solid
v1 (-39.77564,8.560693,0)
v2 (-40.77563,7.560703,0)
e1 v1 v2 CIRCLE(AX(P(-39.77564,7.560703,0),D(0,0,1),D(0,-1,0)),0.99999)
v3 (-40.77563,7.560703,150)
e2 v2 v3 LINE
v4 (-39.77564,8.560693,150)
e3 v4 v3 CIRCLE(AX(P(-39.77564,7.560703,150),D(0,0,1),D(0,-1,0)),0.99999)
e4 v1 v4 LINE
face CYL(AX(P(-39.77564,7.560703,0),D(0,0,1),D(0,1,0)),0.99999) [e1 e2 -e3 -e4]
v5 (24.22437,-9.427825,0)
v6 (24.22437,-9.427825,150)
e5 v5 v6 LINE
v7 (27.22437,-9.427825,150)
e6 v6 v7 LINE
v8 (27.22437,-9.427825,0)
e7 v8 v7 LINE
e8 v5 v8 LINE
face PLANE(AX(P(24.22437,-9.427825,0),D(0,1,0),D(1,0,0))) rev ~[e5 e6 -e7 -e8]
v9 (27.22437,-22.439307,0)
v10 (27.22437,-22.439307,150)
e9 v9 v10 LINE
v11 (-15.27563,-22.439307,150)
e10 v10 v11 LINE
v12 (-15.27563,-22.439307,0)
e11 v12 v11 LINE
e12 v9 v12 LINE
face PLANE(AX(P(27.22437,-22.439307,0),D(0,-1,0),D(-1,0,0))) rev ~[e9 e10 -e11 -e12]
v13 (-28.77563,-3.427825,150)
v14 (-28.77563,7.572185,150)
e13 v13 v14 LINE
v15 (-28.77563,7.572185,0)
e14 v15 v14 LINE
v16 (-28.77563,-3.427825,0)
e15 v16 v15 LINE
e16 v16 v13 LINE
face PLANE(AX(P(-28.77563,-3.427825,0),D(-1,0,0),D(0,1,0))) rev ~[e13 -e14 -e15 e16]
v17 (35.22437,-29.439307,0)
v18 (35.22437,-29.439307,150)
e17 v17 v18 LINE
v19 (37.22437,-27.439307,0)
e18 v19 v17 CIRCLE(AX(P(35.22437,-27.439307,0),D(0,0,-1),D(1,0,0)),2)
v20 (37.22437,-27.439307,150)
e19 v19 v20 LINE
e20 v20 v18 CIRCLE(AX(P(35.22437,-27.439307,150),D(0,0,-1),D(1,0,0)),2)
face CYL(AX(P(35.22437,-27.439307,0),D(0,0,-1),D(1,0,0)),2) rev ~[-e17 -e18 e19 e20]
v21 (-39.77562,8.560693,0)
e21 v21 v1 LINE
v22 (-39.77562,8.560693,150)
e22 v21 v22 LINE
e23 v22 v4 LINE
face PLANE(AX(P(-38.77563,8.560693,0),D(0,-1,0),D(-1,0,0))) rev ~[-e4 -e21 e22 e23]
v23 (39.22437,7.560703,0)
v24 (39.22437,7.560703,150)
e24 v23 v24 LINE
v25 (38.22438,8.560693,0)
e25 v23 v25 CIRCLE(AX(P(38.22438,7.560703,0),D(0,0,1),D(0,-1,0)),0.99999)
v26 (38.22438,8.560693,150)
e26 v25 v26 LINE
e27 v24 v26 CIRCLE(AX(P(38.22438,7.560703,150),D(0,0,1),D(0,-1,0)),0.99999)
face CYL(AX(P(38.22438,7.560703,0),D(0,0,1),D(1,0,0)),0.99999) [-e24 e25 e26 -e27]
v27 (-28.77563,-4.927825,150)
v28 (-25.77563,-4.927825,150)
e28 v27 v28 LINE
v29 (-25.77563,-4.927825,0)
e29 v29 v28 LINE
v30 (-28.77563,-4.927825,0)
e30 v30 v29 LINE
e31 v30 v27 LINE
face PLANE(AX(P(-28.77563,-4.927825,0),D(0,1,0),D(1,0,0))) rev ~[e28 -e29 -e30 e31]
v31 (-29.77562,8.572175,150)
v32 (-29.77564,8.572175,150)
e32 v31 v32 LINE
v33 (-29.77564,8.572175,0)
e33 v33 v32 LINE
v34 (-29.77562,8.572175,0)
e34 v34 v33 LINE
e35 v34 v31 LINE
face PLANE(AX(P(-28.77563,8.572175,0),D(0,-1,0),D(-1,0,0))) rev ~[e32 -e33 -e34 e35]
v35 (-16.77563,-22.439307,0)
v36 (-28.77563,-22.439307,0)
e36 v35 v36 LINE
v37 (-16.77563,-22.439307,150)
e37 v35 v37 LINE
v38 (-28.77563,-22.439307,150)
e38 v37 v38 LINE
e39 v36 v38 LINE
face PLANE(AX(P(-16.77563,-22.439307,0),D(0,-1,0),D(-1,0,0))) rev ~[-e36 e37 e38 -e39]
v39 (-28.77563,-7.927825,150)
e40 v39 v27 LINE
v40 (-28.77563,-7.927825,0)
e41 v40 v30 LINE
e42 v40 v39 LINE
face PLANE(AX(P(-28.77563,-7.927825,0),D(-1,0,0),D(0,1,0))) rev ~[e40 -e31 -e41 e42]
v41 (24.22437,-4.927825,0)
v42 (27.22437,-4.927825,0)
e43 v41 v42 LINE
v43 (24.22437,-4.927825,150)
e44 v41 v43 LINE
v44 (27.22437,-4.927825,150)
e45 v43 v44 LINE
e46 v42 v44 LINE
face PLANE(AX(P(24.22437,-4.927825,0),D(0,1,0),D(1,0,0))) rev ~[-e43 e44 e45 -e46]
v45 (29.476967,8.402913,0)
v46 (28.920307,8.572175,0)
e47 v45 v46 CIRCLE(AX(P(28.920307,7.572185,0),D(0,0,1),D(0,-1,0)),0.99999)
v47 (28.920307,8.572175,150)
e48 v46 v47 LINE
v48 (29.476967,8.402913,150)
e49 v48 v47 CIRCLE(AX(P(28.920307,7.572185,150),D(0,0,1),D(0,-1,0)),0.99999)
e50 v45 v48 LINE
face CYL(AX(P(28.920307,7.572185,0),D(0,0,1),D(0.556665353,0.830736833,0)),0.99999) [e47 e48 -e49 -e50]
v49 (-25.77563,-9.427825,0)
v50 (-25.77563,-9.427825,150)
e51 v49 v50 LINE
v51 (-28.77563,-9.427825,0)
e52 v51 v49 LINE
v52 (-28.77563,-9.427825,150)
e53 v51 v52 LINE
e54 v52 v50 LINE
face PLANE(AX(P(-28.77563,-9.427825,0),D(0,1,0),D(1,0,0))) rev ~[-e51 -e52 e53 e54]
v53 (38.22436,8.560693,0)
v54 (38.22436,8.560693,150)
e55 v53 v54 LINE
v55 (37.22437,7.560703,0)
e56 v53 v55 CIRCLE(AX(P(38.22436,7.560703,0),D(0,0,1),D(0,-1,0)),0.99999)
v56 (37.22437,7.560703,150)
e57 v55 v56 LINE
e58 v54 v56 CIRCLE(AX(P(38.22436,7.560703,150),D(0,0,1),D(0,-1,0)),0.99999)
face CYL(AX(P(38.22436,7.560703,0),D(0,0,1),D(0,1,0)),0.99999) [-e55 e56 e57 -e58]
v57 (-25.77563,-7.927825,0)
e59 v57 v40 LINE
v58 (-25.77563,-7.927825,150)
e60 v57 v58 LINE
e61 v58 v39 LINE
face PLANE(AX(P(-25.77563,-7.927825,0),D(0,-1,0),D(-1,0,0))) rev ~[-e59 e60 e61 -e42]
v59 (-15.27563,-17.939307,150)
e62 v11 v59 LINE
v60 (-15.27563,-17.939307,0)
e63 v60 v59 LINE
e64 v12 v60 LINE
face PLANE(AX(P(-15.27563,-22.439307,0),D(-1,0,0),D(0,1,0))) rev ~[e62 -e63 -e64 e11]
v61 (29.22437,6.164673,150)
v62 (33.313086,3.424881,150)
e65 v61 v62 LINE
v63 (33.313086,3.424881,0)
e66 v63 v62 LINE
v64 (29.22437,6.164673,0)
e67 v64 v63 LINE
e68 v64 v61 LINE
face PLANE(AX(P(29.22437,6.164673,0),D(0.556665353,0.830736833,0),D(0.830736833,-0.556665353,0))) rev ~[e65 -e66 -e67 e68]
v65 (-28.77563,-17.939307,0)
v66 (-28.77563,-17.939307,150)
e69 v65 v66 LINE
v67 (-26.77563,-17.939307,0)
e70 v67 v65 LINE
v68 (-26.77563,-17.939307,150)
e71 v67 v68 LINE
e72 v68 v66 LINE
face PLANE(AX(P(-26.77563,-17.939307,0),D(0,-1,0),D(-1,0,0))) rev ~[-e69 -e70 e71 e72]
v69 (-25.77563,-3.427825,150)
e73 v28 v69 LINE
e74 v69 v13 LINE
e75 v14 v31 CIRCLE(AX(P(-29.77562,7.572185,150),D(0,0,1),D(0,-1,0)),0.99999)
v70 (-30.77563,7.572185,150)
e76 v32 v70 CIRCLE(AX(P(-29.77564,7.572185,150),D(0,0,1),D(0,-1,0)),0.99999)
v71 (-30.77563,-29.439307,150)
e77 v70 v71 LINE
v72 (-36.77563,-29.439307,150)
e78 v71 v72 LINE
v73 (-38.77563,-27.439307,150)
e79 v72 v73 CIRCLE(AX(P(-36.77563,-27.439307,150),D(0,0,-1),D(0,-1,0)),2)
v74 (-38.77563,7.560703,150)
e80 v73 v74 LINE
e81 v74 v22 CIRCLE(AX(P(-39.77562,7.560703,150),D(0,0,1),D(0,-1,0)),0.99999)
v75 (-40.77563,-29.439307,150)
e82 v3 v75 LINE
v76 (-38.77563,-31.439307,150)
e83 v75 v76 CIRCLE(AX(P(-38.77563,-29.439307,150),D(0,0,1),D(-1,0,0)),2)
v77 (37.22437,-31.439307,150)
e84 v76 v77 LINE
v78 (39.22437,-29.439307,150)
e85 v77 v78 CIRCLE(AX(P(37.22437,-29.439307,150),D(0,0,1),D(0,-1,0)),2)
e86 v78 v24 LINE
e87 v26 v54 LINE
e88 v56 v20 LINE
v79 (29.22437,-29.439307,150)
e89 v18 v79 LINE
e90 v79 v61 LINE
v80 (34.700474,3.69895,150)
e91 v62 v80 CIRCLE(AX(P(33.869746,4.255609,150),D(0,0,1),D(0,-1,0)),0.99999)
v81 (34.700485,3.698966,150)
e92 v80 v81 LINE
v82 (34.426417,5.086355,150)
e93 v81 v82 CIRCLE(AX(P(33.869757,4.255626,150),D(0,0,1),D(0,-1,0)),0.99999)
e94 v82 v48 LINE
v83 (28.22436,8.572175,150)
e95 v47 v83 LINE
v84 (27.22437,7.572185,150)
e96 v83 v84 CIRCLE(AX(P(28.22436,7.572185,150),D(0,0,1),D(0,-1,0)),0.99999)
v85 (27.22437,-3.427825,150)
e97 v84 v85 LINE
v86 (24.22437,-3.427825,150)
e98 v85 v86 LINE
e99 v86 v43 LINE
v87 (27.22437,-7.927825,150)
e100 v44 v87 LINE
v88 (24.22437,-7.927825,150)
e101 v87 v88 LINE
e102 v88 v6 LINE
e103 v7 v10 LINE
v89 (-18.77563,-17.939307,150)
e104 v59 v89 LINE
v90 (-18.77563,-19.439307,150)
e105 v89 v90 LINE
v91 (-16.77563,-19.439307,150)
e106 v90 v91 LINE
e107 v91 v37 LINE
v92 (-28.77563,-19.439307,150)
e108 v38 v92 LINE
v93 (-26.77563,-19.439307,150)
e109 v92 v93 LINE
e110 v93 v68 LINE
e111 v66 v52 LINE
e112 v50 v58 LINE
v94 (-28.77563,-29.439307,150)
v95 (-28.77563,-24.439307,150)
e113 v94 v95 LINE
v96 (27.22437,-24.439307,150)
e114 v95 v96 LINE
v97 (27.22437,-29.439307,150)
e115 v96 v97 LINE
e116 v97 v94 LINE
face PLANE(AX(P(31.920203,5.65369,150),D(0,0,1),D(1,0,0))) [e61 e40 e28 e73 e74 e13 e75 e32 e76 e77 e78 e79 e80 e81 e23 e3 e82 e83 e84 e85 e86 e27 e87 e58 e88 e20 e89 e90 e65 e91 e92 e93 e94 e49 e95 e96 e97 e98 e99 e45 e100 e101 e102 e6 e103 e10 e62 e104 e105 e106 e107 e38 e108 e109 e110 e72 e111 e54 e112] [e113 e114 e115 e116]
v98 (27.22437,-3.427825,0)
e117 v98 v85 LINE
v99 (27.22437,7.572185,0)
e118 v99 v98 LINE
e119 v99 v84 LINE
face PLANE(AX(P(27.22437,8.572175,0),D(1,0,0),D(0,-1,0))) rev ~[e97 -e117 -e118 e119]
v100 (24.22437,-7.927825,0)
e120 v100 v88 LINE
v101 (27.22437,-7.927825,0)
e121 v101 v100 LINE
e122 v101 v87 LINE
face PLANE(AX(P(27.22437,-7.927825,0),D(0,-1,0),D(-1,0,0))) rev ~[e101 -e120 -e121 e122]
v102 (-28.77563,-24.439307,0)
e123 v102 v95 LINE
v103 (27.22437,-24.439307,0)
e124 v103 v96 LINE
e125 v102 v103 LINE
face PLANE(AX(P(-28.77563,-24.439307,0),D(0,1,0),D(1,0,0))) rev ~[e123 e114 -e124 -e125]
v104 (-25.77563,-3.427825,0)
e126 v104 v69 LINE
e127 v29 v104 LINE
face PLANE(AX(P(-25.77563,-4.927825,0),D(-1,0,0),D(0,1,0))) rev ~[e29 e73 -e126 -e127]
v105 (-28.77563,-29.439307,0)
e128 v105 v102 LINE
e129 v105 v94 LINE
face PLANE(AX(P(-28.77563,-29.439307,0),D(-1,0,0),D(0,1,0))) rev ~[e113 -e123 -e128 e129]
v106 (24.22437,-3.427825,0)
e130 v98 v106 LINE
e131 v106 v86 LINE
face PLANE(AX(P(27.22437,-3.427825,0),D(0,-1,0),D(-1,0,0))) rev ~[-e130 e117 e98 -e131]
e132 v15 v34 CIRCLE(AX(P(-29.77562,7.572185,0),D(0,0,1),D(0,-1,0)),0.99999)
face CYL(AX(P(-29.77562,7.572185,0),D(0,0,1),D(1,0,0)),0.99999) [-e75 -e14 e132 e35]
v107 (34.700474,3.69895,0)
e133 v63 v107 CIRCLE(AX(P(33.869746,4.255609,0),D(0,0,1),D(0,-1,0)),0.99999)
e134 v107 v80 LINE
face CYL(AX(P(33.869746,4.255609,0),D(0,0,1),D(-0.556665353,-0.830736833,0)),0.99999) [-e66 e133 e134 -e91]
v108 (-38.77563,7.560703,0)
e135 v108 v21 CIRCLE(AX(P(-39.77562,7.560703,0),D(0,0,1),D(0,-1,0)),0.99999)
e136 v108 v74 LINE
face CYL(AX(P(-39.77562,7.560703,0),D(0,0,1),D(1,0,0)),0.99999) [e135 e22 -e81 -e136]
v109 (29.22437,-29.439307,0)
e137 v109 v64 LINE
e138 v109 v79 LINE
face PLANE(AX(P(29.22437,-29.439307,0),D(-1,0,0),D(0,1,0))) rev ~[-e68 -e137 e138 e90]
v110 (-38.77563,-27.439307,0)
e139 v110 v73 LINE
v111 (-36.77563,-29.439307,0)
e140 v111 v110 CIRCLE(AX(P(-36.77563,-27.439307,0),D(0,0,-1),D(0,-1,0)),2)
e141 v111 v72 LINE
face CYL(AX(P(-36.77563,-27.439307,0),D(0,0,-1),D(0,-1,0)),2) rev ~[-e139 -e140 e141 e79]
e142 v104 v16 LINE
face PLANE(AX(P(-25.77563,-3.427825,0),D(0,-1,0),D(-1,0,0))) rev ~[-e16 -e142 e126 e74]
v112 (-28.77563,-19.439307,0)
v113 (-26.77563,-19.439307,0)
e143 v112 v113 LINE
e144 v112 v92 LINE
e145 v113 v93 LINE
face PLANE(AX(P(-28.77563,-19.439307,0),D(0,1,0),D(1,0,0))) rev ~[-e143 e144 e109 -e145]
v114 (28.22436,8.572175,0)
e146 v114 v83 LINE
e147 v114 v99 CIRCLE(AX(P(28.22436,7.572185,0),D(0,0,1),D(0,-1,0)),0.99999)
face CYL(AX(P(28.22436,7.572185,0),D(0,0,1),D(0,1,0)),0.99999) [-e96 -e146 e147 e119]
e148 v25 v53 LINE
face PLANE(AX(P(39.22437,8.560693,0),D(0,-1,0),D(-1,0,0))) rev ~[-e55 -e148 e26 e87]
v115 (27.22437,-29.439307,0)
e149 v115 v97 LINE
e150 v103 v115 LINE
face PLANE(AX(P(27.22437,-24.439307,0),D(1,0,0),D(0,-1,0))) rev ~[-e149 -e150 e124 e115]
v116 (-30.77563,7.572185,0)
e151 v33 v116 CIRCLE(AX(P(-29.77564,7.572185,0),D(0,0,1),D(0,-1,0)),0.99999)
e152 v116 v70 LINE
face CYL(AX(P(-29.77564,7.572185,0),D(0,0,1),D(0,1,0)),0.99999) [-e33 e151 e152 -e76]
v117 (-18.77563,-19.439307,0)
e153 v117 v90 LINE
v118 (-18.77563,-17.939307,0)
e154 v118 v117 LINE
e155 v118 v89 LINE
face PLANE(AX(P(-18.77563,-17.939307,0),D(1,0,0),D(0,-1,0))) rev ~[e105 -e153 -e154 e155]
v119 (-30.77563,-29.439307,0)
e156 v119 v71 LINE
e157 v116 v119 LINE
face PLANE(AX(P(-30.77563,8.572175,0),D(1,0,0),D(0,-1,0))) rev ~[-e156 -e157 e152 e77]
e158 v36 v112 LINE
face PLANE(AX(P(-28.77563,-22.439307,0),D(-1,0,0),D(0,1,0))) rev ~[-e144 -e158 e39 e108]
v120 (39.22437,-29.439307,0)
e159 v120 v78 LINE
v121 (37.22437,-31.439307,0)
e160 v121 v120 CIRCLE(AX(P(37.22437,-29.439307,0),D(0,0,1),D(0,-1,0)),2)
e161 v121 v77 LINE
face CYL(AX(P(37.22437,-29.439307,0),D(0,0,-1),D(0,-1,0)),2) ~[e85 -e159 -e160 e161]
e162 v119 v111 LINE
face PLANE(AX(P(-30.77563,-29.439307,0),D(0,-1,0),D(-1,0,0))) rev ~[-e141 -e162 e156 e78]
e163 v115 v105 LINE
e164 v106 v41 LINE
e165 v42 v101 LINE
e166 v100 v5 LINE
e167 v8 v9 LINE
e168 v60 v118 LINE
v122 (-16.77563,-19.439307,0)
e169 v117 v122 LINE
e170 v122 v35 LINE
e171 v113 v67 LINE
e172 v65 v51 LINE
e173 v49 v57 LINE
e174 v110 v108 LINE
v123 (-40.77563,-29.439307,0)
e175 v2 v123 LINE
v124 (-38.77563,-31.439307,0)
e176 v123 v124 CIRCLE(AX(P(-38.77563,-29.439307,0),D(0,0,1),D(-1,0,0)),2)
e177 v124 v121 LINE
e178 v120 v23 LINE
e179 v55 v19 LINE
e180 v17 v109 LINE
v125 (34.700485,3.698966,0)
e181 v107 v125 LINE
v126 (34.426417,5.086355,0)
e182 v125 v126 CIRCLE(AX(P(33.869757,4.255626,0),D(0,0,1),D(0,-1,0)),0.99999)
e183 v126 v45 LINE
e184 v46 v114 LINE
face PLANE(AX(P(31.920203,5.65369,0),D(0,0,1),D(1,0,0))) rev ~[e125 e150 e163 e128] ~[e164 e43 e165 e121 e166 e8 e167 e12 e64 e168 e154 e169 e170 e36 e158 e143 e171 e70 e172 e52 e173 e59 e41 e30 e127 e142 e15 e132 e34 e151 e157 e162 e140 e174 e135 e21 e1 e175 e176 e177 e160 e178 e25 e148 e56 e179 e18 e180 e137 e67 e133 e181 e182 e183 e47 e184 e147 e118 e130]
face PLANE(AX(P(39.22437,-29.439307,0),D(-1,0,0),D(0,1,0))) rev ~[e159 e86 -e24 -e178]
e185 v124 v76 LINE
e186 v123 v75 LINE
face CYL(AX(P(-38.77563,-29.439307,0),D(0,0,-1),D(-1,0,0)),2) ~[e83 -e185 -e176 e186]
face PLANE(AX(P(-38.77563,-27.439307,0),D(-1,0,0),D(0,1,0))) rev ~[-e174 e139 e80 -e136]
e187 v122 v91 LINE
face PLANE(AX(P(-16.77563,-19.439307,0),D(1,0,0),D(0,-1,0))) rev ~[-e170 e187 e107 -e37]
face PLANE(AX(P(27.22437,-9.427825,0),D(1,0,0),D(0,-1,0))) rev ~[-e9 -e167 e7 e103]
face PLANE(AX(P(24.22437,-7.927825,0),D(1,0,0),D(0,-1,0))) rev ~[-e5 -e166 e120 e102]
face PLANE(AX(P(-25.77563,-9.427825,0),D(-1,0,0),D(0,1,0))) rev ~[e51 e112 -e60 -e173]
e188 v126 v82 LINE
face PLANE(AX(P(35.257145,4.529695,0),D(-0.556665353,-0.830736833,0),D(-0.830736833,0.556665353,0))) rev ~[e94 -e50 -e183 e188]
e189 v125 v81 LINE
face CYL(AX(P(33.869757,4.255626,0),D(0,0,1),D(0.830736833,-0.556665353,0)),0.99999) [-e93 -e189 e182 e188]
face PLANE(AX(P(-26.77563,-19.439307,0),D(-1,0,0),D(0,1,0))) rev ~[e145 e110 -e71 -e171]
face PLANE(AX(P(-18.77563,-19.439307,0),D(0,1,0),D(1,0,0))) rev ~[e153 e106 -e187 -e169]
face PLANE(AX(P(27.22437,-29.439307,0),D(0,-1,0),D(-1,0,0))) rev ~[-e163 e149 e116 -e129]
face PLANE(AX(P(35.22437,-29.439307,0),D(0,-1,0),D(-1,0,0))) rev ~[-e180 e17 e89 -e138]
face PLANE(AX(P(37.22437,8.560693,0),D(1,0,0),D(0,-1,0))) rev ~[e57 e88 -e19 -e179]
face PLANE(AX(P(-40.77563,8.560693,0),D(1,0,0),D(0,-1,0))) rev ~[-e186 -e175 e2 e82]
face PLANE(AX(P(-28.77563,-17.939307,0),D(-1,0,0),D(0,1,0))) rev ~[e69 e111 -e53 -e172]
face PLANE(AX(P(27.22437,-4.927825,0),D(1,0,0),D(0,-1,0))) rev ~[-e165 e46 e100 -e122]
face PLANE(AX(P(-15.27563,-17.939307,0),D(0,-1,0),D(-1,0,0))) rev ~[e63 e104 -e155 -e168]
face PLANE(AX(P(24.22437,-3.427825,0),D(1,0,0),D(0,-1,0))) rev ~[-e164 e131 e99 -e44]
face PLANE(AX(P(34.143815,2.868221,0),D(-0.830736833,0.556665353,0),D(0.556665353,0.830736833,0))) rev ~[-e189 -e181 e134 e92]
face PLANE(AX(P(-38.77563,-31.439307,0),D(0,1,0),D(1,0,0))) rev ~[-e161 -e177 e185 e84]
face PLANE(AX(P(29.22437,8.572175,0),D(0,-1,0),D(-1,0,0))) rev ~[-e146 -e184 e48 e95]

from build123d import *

# Parameters (mm, degrees)
F1_DEPTH = 150
F2_R     = 0.99999


# Not quite as in the source:
# - a fillet or chamfer is up to 0.001 mm smaller than in the source, because OpenCascade refuses the exact size


with BuildPart() as f1:
    # F0 (on Top) → F1 (new body)
    with BuildSketch(Plane.XY):
        Polygon((29.2243703455, 8.5721745163), (29.2243703455, 6.1646732221), (34.1438145412, 2.8682211694), (35.2571452463, 4.5296948349), align=None)
        with BuildLine():
            ThreePointArc((-40.7756296545, -29.4393073201), (-40.1898432169, -30.8535208825), (-38.7756296545, -31.4393073201))
            Line((-38.7756296545, -31.4393073201), (37.2243703455, -31.4393073201))
            ThreePointArc((37.2243703455, -31.4393073201), (38.6385839078, -30.8535208825), (39.2243703455, -29.4393073201))
            Line((39.2243703455, -29.4393073201), (39.2243703455, 8.5606926799))
            Line((39.2243703455, 8.5606926799), (37.2243703455, 8.5606926799))
            Line((37.2243703455, 8.5606926799), (37.2243703455, -27.4393073201))
            ThreePointArc((37.2243703455, -27.4393073201), (36.6385839078, -28.8535208825), (35.2243703455, -29.4393073201))
            Line((35.2243703455, -29.4393073201), (29.2243703455, -29.4393073201))
            Line((29.2243703455, -29.4393073201), (29.2243703455, 6.1646732221))
            Line((29.2243703455, 6.1646732221), (29.2243703455, 8.5721745163))
            Line((29.2243703455, 8.5721745163), (27.2243703455, 8.5721745163))
            Line((27.2243703455, 8.5721745163), (27.2243703455, -3.4278254837))
            Line((27.2243703455, -3.4278254837), (24.2243703455, -3.4278254837))
            Line((24.2243703455, -3.4278254837), (24.2243703455, -4.9278254837))
            Line((24.2243703455, -4.9278254837), (27.2243703455, -4.9278254837))
            Line((27.2243703455, -4.9278254837), (27.2243703455, -7.9278254837))
            Line((27.2243703455, -7.9278254837), (24.2243703455, -7.9278254837))
            Line((24.2243703455, -7.9278254837), (24.2243703455, -9.4278254837))
            Line((24.2243703455, -9.4278254837), (27.2243703455, -9.4278254837))
            Line((27.2243703455, -9.4278254837), (27.2243703455, -22.4393073201))
            Line((27.2243703455, -22.4393073201), (-15.2756296545, -22.4393073201))
            Line((-15.2756296545, -22.4393073201), (-15.2756296545, -17.9393073201))
            Line((-15.2756296545, -17.9393073201), (-18.7756296545, -17.9393073201))
            Line((-18.7756296545, -17.9393073201), (-18.7756296545, -19.4393073201))
            Line((-18.7756296545, -19.4393073201), (-16.7756296545, -19.4393073201))
            Line((-16.7756296545, -19.4393073201), (-16.7756296545, -22.4393073201))
            Line((-16.7756296545, -22.4393073201), (-28.7756296545, -22.4393073201))
            Line((-28.7756296545, -22.4393073201), (-28.7756296545, -19.4393073201))
            Line((-28.7756296545, -19.4393073201), (-26.7756296545, -19.4393073201))
            Line((-26.7756296545, -19.4393073201), (-26.7756296545, -17.9393073201))
            Line((-26.7756296545, -17.9393073201), (-28.7756296545, -17.9393073201))
            Line((-28.7756296545, -17.9393073201), (-28.7756296545, -9.4278254837))
            Line((-28.7756296545, -9.4278254837), (-25.7756296545, -9.4278254837))
            Line((-25.7756296545, -9.4278254837), (-25.7756296545, -7.9278254837))
            Line((-25.7756296545, -7.9278254837), (-28.7756296545, -7.9278254837))
            Line((-28.7756296545, -7.9278254837), (-28.7756296545, -4.9278254837))
            Line((-28.7756296545, -4.9278254837), (-25.7756296545, -4.9278254837))
            Line((-25.7756296545, -4.9278254837), (-25.7756296545, -3.4278254837))
            Line((-25.7756296545, -3.4278254837), (-28.7756296545, -3.4278254837))
            Line((-28.7756296545, -3.4278254837), (-28.7756296545, 8.5721745163))
            Line((-28.7756296545, 8.5721745163), (-30.7756296545, 8.5721745163))
            Line((-30.7756296545, 8.5721745163), (-30.7756296545, -29.4393073201))
            Line((-30.7756296545, -29.4393073201), (-36.7756296545, -29.4393073201))
            ThreePointArc((-36.7756296545, -29.4393073201), (-38.1898432169, -28.8535208825), (-38.7756296545, -27.4393073201))
            Line((-38.7756296545, -27.4393073201), (-38.7756296545, 8.5606926799))
            Line((-38.7756296545, 8.5606926799), (-40.7756296545, 8.5606926799))
            Line((-40.7756296545, 8.5606926799), (-40.7756296545, -29.4393073201))
        make_face()
        Polygon((-28.7756296545, -24.4393073201), (27.2243703455, -24.4393073201), (27.2243703455, -29.4393073201), (-15.2756296545, -29.4393073201), (-16.7756296545, -29.4393073201), (-28.7756296545, -29.4393073201), (-28.7756296545, -26.4393073201), (-28.7756296545, -24.9393073201), align=None, mode=Mode.SUBTRACT)
    extrude(amount=F1_DEPTH)

    # F2 (radius 1 in the source; OpenCascade refuses exactly that, so slightly less here)
    f2_edges = [f1.edges().sort_by_distance(p)[0] for p in [
        (-40.77563, 8.560693, 75),
        (-38.77563, 8.560693, 75),
        (-30.77563, 8.572175, 75),
        (-28.77563, 8.572175, 75),
        (27.22437, 8.572175, 75),
        (29.22437, 8.572175, 75),
        (35.257145, 4.529695, 75),
        (34.143815, 2.868221, 75),
        (37.22437, 8.560693, 75),
        (39.22437, 8.560693, 75),
    ]]
    fillet(f2_edges, radius=F2_R)


solid = f1.part
